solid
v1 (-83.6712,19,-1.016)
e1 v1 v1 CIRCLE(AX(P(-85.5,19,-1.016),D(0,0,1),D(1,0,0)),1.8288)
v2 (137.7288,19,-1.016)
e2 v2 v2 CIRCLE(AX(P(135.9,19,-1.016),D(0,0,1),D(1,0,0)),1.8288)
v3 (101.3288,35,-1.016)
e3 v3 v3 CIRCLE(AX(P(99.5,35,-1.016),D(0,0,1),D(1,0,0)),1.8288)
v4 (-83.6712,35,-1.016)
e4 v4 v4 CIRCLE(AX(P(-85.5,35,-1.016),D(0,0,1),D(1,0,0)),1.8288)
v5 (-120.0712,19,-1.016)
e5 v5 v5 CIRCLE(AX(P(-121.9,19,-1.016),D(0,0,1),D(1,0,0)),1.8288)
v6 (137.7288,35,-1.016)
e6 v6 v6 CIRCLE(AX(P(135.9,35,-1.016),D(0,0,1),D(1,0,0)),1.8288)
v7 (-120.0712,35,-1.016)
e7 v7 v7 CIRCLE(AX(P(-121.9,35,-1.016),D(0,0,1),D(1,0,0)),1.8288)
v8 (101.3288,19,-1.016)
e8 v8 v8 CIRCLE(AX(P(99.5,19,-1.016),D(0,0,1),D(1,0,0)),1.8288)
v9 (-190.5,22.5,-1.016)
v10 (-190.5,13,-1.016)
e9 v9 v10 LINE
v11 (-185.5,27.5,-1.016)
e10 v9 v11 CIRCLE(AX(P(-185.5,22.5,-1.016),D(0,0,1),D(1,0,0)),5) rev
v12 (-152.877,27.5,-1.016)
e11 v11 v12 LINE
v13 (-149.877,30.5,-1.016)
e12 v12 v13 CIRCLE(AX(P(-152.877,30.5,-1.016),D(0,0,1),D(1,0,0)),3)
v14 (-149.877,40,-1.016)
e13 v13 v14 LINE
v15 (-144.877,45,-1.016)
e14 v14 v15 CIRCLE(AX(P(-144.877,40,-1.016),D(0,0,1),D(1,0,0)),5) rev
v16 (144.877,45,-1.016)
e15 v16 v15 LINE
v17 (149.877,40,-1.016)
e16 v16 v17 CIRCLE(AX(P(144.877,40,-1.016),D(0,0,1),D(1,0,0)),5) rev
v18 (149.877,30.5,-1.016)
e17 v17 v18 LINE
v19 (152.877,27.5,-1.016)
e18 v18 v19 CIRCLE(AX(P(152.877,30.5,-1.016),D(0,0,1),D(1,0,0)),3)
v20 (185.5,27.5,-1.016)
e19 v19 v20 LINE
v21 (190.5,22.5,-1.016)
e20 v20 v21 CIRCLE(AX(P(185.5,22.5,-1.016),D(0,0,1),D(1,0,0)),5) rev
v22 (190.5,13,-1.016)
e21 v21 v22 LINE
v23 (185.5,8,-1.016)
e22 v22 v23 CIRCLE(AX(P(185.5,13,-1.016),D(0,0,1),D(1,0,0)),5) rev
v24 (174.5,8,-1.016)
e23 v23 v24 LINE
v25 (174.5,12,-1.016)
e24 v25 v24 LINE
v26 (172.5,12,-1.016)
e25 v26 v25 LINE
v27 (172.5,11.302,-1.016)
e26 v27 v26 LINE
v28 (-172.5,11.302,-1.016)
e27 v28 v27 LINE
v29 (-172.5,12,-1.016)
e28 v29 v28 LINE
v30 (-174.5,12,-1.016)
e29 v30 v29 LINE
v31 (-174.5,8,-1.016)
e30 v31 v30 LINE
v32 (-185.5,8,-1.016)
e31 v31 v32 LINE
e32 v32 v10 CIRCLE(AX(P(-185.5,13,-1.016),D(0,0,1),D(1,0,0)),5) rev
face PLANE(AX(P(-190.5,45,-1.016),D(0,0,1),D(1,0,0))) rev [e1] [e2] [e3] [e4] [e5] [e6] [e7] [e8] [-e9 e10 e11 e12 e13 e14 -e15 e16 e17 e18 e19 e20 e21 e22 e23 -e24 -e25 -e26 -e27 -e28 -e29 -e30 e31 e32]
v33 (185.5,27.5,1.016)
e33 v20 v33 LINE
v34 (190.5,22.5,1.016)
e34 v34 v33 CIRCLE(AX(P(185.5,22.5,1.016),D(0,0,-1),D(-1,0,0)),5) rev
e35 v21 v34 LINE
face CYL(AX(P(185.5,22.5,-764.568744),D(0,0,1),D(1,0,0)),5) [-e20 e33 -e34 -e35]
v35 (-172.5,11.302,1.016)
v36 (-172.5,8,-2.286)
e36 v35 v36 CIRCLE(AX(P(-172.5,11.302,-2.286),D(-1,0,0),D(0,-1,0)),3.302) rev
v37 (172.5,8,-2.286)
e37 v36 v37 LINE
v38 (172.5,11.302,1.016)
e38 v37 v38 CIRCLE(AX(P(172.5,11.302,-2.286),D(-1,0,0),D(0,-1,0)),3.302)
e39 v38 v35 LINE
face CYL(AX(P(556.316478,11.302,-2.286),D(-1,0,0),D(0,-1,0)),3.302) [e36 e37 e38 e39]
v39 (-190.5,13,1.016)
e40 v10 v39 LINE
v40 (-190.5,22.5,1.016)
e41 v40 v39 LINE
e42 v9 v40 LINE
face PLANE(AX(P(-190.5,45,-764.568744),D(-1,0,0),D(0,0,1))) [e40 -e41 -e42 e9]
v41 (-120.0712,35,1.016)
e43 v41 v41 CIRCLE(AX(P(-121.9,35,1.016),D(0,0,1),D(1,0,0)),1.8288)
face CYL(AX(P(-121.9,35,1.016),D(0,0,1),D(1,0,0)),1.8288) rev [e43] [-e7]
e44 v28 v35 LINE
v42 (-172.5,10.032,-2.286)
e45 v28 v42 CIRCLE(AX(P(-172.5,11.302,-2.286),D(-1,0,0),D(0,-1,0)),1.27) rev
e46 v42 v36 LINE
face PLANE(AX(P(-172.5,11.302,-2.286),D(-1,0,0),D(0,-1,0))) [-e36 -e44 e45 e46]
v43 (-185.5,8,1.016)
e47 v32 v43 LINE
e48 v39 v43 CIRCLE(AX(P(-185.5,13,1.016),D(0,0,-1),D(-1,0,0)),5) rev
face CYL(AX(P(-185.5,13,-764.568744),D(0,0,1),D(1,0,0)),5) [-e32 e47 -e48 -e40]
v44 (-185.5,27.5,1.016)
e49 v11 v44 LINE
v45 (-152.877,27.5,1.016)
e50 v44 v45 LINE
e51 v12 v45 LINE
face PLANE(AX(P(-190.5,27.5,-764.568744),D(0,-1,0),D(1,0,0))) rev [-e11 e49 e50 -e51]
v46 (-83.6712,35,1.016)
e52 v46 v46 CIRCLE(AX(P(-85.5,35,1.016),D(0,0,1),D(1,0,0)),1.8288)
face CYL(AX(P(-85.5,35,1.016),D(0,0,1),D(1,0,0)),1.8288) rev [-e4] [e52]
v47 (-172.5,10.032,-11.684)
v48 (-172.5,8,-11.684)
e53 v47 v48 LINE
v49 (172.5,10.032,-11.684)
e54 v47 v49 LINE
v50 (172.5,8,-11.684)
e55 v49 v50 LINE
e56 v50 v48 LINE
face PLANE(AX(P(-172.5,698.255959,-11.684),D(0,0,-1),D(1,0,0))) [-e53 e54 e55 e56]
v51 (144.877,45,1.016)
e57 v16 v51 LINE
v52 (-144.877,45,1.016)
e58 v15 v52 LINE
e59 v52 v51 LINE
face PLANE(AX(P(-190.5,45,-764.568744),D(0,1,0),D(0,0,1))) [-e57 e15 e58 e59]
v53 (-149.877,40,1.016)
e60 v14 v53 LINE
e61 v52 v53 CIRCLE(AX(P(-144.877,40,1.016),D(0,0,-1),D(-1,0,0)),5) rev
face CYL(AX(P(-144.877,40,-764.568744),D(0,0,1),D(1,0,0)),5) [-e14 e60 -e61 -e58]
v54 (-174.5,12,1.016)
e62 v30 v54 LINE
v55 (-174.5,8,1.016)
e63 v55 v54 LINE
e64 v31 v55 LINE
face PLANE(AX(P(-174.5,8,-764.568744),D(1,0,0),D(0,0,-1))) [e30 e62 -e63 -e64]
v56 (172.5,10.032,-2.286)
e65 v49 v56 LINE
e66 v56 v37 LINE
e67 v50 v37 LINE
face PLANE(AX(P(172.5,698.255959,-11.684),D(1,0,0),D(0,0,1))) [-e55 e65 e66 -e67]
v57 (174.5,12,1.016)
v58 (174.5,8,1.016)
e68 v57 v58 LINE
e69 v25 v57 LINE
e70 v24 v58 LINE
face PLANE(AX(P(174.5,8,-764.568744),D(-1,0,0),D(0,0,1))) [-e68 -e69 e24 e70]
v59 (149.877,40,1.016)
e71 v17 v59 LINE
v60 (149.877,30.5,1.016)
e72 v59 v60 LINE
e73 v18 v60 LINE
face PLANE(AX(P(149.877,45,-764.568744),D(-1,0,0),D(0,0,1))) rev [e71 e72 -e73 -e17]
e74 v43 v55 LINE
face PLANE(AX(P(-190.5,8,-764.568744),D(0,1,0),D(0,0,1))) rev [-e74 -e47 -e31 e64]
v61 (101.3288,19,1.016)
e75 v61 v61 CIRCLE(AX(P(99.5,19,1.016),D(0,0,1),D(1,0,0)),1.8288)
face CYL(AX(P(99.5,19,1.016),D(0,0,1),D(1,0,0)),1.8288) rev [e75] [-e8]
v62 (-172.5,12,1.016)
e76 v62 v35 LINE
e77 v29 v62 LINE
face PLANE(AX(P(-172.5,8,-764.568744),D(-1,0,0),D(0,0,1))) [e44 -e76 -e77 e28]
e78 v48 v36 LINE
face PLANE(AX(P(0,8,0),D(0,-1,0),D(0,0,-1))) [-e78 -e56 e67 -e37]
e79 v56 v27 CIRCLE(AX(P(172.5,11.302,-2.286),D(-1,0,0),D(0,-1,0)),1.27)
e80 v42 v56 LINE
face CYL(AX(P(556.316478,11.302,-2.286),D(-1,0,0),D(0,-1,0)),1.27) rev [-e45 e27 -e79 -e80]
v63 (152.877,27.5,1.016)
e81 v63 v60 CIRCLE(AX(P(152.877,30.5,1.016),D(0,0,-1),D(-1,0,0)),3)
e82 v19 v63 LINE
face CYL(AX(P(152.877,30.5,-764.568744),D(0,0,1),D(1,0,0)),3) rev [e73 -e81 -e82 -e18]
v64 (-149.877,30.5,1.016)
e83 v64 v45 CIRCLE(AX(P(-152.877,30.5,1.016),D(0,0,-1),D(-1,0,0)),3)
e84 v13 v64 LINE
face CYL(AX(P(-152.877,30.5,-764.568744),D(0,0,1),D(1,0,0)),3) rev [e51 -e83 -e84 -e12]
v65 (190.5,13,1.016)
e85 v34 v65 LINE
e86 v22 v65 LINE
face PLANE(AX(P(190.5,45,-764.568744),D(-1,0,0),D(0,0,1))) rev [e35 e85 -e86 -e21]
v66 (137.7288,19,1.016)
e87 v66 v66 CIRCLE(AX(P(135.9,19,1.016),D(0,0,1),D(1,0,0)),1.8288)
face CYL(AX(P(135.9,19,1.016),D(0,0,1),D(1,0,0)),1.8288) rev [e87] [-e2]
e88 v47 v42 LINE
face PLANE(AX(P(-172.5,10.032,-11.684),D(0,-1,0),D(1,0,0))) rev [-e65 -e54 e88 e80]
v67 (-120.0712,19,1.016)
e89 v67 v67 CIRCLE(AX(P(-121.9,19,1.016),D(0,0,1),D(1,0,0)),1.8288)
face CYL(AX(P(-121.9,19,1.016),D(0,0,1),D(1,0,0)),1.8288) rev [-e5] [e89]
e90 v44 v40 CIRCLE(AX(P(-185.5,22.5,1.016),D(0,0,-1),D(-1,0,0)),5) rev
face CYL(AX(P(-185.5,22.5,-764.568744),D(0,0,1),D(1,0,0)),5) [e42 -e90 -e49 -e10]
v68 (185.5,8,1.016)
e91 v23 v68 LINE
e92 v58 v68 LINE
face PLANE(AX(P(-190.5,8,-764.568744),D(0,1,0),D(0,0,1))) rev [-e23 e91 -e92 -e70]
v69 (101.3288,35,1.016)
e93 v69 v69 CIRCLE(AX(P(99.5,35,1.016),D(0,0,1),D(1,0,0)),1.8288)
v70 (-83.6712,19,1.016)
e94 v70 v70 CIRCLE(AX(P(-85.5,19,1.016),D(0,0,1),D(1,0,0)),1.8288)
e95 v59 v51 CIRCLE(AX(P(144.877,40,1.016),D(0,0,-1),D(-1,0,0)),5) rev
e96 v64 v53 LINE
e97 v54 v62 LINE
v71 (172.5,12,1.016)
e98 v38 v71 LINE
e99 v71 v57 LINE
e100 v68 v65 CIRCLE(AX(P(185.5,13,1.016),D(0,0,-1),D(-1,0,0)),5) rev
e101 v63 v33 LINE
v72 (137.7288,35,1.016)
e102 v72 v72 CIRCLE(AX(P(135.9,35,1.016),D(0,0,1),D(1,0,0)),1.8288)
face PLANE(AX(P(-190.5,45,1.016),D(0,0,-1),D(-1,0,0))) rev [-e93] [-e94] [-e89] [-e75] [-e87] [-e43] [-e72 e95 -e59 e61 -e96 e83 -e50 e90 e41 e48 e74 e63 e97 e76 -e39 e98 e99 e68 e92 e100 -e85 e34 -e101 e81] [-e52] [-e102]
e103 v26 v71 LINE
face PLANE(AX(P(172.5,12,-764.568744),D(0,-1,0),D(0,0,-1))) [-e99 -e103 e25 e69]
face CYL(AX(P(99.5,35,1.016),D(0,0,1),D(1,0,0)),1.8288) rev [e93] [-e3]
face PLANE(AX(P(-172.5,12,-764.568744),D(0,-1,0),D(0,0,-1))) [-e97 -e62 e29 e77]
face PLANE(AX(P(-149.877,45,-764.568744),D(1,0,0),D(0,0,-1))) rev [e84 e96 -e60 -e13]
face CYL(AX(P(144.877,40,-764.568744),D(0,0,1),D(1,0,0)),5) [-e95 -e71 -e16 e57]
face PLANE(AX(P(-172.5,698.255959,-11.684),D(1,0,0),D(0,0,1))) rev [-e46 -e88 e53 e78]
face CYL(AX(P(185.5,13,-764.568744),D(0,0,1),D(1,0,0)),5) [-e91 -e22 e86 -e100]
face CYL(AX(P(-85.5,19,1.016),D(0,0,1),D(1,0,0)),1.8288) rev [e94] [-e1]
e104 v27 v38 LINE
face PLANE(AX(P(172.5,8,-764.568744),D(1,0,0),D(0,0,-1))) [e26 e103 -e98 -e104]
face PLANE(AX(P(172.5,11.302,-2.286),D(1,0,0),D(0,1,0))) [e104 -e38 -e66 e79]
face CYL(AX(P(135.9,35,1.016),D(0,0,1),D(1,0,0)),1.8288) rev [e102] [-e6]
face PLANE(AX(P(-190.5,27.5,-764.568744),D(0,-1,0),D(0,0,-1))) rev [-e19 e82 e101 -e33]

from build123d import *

# Parameters (mm, degrees)
BOSS_EXTRUDE1_START        = 8
SKETCH2_W                  = 381
SKETCH2_H                  = 2.032
BOSS_EXTRUDE1_DEPTH        = 37
SKETCH3_W                  = 345
SKETCH3_H                  = 2.032
BOSS_EXTRUDE2_DEPTH        = 10.668
SKETCH4_W                  = 40.623
SKETCH4_H                  = 17.5
CUT_EXTRUDE1_DEPTH         = 3
F_6_CLEARANCE_HOLE1_D      = 3.6576
FILLET2_R                  = 5
FILLET3_R                  = 3
SKETCH8_W                  = 2
SKETCH8_H                  = 4
CUT_EXTRUDE2_DEPTH         = 197.033303864
FLATTEN_BENDS1_START       = -11.684
FLATTEN_BENDS1_OUTLINE_W   = 345
FLATTEN_BENDS1_OUTLINE_H   = 2.032
FLATTEN_BENDS1_DEPTH       = 10.668
FLATTEN_BENDS1_START_2     = -1.016
FLATTEN_BENDS1_2_OUTLINE_W = 345
FLATTEN_BENDS1_2_OUTLINE_H = 9.367654589
FLATTEN_BENDS1_2_DEPTH     = 2.032
PROCESS_BENDS1_START       = -172.5
PROCESS_BENDS1_DEPTH       = 345
PROCESS_BENDS1_2_DEPTH     = 345


# Read off the part's stored shape, not the designer's step: Flatten-Bends1, Process-Bends1
with BuildPart() as part:
    # Sketch2 → Boss-Extrude1 (new body)
    with BuildSketch(Plane(origin=(0, 0, 0), x_dir=(1, 0, 0), z_dir=(0, 1, 0)).offset(BOSS_EXTRUDE1_START)):
        Rectangle(SKETCH2_W, SKETCH2_H)
    extrude(amount=BOSS_EXTRUDE1_DEPTH)

    # Sketch3 → Boss-Extrude2 (add)
    with BuildSketch(Plane(origin=(0, 0, -1.016), x_dir=(-1, 0, 0), z_dir=(0, 0, -1))):
        with Locations((0, 9.016)):
            Rectangle(SKETCH3_W, SKETCH3_H)
    extrude(amount=BOSS_EXTRUDE2_DEPTH)

    # Sketch4 → Cut-Extrude1 (cut)
    with BuildSketch(Plane.XY.offset(1.016)):
        with Locations((170.1885, 36.25)):
            Rectangle(SKETCH4_W, SKETCH4_H)
        with Locations((-170.1885, 36.25)):
            Rectangle(SKETCH4_W, SKETCH4_H)
    extrude(amount=-CUT_EXTRUDE1_DEPTH, mode=Mode.SUBTRACT)

    # #6 Clearance Hole1 (through all)
    with Locations(Plane.XY.offset(1.016)):
        with Locations((-121.9, 35), (-121.9, 19), (-85.5, 35), (-85.5, 19), (99.5, 19), (99.5, 35), (135.9, 35), (135.9, 19)):
            Hole(F_6_CLEARANCE_HOLE1_D / 2)

    # Fillet2
    fillet2_edges = [part.edges().sort_by_distance(p)[0] for p in [
        (-190.5, 27.5, 0),
        (-149.877, 45, 0),
        (190.5, 27.5, 0),
        (149.877, 45, 0),
        (-190.5, 8, 0),
        (190.5, 8, 0),
    ]]
    fillet(fillet2_edges, radius=FILLET2_R)

    # Fillet3
    fillet3_edges = [part.edges().sort_by_distance(p)[0] for p in [
        (-149.877, 27.5, 0),
        (149.877, 27.5, 0),
    ]]
    fillet(fillet3_edges, radius=FILLET3_R)

    # Sketch8 → Cut-Extrude2 (cut, through all)
    with BuildSketch(Plane(origin=(0, 0, -1.016), x_dir=(-1, 0, 0), z_dir=(0, 0, -1))):
        with Locations((173.5, 10)):
            Rectangle(SKETCH8_W, SKETCH8_H)
        with Locations((-173.5, 10)):
            Rectangle(SKETCH8_W, SKETCH8_H)
    extrude(amount=-CUT_EXTRUDE2_DEPTH, mode=Mode.SUBTRACT)

    # Flatten-Bends1 outline → Flatten-Bends1 (cut)
    with BuildSketch(Plane.XY.offset(FLATTEN_BENDS1_START)):
        with Locations((0, 9.016)):
            Rectangle(FLATTEN_BENDS1_OUTLINE_W, FLATTEN_BENDS1_OUTLINE_H)
    extrude(amount=FLATTEN_BENDS1_DEPTH, mode=Mode.SUBTRACT)

    # Flatten-Bends1 2 outline → Flatten-Bends1 2 (add)
    with BuildSketch(Plane.XY.offset(FLATTEN_BENDS1_START_2)):
        with Locations((0, 3.316172706)):
            Rectangle(FLATTEN_BENDS1_2_OUTLINE_W, FLATTEN_BENDS1_2_OUTLINE_H)
    extrude(amount=FLATTEN_BENDS1_2_DEPTH)

    # Process-Bends1 outline → Process-Bends1 (cut)
    with BuildSketch(Plane.YZ.offset(PROCESS_BENDS1_START)):
        with BuildLine():
            Line((-1.367654589, -1.016), (8.254000001, -1.016))
            ThreePointArc((8.254000001, -1.016), (9.470379953, 0.461430071), (11.302, 1.016))
            Line((11.302, 1.016), (-1.367654589, 1.016))
            Line((-1.367654589, 1.016), (-1.367654589, -1.016))
        make_face()
    extrude(amount=PROCESS_BENDS1_DEPTH, mode=Mode.SUBTRACT)

    # Process-Bends1 2 outline → Process-Bends1 2 (add)
    with BuildSketch(Plane.YZ.offset(PROCESS_BENDS1_START)):
        with BuildLine():
            Line((8, -2.286), (8, -11.684))
            Line((8, -11.684), (10.032, -11.684))
            Line((10.032, -11.684), (10.032, -2.286))
            ThreePointArc((10.032, -2.286), (10.403974388, -1.387974388), (11.302, -1.016))
            Line((11.302, -1.016), (8.254000001, -1.016))
            ThreePointArc((8.254000001, -1.016), (8.064122609, -1.638424522), (8, -2.286))
        make_face()
    extrude(amount=PROCESS_BENDS1_2_DEPTH)


solid = part.part
